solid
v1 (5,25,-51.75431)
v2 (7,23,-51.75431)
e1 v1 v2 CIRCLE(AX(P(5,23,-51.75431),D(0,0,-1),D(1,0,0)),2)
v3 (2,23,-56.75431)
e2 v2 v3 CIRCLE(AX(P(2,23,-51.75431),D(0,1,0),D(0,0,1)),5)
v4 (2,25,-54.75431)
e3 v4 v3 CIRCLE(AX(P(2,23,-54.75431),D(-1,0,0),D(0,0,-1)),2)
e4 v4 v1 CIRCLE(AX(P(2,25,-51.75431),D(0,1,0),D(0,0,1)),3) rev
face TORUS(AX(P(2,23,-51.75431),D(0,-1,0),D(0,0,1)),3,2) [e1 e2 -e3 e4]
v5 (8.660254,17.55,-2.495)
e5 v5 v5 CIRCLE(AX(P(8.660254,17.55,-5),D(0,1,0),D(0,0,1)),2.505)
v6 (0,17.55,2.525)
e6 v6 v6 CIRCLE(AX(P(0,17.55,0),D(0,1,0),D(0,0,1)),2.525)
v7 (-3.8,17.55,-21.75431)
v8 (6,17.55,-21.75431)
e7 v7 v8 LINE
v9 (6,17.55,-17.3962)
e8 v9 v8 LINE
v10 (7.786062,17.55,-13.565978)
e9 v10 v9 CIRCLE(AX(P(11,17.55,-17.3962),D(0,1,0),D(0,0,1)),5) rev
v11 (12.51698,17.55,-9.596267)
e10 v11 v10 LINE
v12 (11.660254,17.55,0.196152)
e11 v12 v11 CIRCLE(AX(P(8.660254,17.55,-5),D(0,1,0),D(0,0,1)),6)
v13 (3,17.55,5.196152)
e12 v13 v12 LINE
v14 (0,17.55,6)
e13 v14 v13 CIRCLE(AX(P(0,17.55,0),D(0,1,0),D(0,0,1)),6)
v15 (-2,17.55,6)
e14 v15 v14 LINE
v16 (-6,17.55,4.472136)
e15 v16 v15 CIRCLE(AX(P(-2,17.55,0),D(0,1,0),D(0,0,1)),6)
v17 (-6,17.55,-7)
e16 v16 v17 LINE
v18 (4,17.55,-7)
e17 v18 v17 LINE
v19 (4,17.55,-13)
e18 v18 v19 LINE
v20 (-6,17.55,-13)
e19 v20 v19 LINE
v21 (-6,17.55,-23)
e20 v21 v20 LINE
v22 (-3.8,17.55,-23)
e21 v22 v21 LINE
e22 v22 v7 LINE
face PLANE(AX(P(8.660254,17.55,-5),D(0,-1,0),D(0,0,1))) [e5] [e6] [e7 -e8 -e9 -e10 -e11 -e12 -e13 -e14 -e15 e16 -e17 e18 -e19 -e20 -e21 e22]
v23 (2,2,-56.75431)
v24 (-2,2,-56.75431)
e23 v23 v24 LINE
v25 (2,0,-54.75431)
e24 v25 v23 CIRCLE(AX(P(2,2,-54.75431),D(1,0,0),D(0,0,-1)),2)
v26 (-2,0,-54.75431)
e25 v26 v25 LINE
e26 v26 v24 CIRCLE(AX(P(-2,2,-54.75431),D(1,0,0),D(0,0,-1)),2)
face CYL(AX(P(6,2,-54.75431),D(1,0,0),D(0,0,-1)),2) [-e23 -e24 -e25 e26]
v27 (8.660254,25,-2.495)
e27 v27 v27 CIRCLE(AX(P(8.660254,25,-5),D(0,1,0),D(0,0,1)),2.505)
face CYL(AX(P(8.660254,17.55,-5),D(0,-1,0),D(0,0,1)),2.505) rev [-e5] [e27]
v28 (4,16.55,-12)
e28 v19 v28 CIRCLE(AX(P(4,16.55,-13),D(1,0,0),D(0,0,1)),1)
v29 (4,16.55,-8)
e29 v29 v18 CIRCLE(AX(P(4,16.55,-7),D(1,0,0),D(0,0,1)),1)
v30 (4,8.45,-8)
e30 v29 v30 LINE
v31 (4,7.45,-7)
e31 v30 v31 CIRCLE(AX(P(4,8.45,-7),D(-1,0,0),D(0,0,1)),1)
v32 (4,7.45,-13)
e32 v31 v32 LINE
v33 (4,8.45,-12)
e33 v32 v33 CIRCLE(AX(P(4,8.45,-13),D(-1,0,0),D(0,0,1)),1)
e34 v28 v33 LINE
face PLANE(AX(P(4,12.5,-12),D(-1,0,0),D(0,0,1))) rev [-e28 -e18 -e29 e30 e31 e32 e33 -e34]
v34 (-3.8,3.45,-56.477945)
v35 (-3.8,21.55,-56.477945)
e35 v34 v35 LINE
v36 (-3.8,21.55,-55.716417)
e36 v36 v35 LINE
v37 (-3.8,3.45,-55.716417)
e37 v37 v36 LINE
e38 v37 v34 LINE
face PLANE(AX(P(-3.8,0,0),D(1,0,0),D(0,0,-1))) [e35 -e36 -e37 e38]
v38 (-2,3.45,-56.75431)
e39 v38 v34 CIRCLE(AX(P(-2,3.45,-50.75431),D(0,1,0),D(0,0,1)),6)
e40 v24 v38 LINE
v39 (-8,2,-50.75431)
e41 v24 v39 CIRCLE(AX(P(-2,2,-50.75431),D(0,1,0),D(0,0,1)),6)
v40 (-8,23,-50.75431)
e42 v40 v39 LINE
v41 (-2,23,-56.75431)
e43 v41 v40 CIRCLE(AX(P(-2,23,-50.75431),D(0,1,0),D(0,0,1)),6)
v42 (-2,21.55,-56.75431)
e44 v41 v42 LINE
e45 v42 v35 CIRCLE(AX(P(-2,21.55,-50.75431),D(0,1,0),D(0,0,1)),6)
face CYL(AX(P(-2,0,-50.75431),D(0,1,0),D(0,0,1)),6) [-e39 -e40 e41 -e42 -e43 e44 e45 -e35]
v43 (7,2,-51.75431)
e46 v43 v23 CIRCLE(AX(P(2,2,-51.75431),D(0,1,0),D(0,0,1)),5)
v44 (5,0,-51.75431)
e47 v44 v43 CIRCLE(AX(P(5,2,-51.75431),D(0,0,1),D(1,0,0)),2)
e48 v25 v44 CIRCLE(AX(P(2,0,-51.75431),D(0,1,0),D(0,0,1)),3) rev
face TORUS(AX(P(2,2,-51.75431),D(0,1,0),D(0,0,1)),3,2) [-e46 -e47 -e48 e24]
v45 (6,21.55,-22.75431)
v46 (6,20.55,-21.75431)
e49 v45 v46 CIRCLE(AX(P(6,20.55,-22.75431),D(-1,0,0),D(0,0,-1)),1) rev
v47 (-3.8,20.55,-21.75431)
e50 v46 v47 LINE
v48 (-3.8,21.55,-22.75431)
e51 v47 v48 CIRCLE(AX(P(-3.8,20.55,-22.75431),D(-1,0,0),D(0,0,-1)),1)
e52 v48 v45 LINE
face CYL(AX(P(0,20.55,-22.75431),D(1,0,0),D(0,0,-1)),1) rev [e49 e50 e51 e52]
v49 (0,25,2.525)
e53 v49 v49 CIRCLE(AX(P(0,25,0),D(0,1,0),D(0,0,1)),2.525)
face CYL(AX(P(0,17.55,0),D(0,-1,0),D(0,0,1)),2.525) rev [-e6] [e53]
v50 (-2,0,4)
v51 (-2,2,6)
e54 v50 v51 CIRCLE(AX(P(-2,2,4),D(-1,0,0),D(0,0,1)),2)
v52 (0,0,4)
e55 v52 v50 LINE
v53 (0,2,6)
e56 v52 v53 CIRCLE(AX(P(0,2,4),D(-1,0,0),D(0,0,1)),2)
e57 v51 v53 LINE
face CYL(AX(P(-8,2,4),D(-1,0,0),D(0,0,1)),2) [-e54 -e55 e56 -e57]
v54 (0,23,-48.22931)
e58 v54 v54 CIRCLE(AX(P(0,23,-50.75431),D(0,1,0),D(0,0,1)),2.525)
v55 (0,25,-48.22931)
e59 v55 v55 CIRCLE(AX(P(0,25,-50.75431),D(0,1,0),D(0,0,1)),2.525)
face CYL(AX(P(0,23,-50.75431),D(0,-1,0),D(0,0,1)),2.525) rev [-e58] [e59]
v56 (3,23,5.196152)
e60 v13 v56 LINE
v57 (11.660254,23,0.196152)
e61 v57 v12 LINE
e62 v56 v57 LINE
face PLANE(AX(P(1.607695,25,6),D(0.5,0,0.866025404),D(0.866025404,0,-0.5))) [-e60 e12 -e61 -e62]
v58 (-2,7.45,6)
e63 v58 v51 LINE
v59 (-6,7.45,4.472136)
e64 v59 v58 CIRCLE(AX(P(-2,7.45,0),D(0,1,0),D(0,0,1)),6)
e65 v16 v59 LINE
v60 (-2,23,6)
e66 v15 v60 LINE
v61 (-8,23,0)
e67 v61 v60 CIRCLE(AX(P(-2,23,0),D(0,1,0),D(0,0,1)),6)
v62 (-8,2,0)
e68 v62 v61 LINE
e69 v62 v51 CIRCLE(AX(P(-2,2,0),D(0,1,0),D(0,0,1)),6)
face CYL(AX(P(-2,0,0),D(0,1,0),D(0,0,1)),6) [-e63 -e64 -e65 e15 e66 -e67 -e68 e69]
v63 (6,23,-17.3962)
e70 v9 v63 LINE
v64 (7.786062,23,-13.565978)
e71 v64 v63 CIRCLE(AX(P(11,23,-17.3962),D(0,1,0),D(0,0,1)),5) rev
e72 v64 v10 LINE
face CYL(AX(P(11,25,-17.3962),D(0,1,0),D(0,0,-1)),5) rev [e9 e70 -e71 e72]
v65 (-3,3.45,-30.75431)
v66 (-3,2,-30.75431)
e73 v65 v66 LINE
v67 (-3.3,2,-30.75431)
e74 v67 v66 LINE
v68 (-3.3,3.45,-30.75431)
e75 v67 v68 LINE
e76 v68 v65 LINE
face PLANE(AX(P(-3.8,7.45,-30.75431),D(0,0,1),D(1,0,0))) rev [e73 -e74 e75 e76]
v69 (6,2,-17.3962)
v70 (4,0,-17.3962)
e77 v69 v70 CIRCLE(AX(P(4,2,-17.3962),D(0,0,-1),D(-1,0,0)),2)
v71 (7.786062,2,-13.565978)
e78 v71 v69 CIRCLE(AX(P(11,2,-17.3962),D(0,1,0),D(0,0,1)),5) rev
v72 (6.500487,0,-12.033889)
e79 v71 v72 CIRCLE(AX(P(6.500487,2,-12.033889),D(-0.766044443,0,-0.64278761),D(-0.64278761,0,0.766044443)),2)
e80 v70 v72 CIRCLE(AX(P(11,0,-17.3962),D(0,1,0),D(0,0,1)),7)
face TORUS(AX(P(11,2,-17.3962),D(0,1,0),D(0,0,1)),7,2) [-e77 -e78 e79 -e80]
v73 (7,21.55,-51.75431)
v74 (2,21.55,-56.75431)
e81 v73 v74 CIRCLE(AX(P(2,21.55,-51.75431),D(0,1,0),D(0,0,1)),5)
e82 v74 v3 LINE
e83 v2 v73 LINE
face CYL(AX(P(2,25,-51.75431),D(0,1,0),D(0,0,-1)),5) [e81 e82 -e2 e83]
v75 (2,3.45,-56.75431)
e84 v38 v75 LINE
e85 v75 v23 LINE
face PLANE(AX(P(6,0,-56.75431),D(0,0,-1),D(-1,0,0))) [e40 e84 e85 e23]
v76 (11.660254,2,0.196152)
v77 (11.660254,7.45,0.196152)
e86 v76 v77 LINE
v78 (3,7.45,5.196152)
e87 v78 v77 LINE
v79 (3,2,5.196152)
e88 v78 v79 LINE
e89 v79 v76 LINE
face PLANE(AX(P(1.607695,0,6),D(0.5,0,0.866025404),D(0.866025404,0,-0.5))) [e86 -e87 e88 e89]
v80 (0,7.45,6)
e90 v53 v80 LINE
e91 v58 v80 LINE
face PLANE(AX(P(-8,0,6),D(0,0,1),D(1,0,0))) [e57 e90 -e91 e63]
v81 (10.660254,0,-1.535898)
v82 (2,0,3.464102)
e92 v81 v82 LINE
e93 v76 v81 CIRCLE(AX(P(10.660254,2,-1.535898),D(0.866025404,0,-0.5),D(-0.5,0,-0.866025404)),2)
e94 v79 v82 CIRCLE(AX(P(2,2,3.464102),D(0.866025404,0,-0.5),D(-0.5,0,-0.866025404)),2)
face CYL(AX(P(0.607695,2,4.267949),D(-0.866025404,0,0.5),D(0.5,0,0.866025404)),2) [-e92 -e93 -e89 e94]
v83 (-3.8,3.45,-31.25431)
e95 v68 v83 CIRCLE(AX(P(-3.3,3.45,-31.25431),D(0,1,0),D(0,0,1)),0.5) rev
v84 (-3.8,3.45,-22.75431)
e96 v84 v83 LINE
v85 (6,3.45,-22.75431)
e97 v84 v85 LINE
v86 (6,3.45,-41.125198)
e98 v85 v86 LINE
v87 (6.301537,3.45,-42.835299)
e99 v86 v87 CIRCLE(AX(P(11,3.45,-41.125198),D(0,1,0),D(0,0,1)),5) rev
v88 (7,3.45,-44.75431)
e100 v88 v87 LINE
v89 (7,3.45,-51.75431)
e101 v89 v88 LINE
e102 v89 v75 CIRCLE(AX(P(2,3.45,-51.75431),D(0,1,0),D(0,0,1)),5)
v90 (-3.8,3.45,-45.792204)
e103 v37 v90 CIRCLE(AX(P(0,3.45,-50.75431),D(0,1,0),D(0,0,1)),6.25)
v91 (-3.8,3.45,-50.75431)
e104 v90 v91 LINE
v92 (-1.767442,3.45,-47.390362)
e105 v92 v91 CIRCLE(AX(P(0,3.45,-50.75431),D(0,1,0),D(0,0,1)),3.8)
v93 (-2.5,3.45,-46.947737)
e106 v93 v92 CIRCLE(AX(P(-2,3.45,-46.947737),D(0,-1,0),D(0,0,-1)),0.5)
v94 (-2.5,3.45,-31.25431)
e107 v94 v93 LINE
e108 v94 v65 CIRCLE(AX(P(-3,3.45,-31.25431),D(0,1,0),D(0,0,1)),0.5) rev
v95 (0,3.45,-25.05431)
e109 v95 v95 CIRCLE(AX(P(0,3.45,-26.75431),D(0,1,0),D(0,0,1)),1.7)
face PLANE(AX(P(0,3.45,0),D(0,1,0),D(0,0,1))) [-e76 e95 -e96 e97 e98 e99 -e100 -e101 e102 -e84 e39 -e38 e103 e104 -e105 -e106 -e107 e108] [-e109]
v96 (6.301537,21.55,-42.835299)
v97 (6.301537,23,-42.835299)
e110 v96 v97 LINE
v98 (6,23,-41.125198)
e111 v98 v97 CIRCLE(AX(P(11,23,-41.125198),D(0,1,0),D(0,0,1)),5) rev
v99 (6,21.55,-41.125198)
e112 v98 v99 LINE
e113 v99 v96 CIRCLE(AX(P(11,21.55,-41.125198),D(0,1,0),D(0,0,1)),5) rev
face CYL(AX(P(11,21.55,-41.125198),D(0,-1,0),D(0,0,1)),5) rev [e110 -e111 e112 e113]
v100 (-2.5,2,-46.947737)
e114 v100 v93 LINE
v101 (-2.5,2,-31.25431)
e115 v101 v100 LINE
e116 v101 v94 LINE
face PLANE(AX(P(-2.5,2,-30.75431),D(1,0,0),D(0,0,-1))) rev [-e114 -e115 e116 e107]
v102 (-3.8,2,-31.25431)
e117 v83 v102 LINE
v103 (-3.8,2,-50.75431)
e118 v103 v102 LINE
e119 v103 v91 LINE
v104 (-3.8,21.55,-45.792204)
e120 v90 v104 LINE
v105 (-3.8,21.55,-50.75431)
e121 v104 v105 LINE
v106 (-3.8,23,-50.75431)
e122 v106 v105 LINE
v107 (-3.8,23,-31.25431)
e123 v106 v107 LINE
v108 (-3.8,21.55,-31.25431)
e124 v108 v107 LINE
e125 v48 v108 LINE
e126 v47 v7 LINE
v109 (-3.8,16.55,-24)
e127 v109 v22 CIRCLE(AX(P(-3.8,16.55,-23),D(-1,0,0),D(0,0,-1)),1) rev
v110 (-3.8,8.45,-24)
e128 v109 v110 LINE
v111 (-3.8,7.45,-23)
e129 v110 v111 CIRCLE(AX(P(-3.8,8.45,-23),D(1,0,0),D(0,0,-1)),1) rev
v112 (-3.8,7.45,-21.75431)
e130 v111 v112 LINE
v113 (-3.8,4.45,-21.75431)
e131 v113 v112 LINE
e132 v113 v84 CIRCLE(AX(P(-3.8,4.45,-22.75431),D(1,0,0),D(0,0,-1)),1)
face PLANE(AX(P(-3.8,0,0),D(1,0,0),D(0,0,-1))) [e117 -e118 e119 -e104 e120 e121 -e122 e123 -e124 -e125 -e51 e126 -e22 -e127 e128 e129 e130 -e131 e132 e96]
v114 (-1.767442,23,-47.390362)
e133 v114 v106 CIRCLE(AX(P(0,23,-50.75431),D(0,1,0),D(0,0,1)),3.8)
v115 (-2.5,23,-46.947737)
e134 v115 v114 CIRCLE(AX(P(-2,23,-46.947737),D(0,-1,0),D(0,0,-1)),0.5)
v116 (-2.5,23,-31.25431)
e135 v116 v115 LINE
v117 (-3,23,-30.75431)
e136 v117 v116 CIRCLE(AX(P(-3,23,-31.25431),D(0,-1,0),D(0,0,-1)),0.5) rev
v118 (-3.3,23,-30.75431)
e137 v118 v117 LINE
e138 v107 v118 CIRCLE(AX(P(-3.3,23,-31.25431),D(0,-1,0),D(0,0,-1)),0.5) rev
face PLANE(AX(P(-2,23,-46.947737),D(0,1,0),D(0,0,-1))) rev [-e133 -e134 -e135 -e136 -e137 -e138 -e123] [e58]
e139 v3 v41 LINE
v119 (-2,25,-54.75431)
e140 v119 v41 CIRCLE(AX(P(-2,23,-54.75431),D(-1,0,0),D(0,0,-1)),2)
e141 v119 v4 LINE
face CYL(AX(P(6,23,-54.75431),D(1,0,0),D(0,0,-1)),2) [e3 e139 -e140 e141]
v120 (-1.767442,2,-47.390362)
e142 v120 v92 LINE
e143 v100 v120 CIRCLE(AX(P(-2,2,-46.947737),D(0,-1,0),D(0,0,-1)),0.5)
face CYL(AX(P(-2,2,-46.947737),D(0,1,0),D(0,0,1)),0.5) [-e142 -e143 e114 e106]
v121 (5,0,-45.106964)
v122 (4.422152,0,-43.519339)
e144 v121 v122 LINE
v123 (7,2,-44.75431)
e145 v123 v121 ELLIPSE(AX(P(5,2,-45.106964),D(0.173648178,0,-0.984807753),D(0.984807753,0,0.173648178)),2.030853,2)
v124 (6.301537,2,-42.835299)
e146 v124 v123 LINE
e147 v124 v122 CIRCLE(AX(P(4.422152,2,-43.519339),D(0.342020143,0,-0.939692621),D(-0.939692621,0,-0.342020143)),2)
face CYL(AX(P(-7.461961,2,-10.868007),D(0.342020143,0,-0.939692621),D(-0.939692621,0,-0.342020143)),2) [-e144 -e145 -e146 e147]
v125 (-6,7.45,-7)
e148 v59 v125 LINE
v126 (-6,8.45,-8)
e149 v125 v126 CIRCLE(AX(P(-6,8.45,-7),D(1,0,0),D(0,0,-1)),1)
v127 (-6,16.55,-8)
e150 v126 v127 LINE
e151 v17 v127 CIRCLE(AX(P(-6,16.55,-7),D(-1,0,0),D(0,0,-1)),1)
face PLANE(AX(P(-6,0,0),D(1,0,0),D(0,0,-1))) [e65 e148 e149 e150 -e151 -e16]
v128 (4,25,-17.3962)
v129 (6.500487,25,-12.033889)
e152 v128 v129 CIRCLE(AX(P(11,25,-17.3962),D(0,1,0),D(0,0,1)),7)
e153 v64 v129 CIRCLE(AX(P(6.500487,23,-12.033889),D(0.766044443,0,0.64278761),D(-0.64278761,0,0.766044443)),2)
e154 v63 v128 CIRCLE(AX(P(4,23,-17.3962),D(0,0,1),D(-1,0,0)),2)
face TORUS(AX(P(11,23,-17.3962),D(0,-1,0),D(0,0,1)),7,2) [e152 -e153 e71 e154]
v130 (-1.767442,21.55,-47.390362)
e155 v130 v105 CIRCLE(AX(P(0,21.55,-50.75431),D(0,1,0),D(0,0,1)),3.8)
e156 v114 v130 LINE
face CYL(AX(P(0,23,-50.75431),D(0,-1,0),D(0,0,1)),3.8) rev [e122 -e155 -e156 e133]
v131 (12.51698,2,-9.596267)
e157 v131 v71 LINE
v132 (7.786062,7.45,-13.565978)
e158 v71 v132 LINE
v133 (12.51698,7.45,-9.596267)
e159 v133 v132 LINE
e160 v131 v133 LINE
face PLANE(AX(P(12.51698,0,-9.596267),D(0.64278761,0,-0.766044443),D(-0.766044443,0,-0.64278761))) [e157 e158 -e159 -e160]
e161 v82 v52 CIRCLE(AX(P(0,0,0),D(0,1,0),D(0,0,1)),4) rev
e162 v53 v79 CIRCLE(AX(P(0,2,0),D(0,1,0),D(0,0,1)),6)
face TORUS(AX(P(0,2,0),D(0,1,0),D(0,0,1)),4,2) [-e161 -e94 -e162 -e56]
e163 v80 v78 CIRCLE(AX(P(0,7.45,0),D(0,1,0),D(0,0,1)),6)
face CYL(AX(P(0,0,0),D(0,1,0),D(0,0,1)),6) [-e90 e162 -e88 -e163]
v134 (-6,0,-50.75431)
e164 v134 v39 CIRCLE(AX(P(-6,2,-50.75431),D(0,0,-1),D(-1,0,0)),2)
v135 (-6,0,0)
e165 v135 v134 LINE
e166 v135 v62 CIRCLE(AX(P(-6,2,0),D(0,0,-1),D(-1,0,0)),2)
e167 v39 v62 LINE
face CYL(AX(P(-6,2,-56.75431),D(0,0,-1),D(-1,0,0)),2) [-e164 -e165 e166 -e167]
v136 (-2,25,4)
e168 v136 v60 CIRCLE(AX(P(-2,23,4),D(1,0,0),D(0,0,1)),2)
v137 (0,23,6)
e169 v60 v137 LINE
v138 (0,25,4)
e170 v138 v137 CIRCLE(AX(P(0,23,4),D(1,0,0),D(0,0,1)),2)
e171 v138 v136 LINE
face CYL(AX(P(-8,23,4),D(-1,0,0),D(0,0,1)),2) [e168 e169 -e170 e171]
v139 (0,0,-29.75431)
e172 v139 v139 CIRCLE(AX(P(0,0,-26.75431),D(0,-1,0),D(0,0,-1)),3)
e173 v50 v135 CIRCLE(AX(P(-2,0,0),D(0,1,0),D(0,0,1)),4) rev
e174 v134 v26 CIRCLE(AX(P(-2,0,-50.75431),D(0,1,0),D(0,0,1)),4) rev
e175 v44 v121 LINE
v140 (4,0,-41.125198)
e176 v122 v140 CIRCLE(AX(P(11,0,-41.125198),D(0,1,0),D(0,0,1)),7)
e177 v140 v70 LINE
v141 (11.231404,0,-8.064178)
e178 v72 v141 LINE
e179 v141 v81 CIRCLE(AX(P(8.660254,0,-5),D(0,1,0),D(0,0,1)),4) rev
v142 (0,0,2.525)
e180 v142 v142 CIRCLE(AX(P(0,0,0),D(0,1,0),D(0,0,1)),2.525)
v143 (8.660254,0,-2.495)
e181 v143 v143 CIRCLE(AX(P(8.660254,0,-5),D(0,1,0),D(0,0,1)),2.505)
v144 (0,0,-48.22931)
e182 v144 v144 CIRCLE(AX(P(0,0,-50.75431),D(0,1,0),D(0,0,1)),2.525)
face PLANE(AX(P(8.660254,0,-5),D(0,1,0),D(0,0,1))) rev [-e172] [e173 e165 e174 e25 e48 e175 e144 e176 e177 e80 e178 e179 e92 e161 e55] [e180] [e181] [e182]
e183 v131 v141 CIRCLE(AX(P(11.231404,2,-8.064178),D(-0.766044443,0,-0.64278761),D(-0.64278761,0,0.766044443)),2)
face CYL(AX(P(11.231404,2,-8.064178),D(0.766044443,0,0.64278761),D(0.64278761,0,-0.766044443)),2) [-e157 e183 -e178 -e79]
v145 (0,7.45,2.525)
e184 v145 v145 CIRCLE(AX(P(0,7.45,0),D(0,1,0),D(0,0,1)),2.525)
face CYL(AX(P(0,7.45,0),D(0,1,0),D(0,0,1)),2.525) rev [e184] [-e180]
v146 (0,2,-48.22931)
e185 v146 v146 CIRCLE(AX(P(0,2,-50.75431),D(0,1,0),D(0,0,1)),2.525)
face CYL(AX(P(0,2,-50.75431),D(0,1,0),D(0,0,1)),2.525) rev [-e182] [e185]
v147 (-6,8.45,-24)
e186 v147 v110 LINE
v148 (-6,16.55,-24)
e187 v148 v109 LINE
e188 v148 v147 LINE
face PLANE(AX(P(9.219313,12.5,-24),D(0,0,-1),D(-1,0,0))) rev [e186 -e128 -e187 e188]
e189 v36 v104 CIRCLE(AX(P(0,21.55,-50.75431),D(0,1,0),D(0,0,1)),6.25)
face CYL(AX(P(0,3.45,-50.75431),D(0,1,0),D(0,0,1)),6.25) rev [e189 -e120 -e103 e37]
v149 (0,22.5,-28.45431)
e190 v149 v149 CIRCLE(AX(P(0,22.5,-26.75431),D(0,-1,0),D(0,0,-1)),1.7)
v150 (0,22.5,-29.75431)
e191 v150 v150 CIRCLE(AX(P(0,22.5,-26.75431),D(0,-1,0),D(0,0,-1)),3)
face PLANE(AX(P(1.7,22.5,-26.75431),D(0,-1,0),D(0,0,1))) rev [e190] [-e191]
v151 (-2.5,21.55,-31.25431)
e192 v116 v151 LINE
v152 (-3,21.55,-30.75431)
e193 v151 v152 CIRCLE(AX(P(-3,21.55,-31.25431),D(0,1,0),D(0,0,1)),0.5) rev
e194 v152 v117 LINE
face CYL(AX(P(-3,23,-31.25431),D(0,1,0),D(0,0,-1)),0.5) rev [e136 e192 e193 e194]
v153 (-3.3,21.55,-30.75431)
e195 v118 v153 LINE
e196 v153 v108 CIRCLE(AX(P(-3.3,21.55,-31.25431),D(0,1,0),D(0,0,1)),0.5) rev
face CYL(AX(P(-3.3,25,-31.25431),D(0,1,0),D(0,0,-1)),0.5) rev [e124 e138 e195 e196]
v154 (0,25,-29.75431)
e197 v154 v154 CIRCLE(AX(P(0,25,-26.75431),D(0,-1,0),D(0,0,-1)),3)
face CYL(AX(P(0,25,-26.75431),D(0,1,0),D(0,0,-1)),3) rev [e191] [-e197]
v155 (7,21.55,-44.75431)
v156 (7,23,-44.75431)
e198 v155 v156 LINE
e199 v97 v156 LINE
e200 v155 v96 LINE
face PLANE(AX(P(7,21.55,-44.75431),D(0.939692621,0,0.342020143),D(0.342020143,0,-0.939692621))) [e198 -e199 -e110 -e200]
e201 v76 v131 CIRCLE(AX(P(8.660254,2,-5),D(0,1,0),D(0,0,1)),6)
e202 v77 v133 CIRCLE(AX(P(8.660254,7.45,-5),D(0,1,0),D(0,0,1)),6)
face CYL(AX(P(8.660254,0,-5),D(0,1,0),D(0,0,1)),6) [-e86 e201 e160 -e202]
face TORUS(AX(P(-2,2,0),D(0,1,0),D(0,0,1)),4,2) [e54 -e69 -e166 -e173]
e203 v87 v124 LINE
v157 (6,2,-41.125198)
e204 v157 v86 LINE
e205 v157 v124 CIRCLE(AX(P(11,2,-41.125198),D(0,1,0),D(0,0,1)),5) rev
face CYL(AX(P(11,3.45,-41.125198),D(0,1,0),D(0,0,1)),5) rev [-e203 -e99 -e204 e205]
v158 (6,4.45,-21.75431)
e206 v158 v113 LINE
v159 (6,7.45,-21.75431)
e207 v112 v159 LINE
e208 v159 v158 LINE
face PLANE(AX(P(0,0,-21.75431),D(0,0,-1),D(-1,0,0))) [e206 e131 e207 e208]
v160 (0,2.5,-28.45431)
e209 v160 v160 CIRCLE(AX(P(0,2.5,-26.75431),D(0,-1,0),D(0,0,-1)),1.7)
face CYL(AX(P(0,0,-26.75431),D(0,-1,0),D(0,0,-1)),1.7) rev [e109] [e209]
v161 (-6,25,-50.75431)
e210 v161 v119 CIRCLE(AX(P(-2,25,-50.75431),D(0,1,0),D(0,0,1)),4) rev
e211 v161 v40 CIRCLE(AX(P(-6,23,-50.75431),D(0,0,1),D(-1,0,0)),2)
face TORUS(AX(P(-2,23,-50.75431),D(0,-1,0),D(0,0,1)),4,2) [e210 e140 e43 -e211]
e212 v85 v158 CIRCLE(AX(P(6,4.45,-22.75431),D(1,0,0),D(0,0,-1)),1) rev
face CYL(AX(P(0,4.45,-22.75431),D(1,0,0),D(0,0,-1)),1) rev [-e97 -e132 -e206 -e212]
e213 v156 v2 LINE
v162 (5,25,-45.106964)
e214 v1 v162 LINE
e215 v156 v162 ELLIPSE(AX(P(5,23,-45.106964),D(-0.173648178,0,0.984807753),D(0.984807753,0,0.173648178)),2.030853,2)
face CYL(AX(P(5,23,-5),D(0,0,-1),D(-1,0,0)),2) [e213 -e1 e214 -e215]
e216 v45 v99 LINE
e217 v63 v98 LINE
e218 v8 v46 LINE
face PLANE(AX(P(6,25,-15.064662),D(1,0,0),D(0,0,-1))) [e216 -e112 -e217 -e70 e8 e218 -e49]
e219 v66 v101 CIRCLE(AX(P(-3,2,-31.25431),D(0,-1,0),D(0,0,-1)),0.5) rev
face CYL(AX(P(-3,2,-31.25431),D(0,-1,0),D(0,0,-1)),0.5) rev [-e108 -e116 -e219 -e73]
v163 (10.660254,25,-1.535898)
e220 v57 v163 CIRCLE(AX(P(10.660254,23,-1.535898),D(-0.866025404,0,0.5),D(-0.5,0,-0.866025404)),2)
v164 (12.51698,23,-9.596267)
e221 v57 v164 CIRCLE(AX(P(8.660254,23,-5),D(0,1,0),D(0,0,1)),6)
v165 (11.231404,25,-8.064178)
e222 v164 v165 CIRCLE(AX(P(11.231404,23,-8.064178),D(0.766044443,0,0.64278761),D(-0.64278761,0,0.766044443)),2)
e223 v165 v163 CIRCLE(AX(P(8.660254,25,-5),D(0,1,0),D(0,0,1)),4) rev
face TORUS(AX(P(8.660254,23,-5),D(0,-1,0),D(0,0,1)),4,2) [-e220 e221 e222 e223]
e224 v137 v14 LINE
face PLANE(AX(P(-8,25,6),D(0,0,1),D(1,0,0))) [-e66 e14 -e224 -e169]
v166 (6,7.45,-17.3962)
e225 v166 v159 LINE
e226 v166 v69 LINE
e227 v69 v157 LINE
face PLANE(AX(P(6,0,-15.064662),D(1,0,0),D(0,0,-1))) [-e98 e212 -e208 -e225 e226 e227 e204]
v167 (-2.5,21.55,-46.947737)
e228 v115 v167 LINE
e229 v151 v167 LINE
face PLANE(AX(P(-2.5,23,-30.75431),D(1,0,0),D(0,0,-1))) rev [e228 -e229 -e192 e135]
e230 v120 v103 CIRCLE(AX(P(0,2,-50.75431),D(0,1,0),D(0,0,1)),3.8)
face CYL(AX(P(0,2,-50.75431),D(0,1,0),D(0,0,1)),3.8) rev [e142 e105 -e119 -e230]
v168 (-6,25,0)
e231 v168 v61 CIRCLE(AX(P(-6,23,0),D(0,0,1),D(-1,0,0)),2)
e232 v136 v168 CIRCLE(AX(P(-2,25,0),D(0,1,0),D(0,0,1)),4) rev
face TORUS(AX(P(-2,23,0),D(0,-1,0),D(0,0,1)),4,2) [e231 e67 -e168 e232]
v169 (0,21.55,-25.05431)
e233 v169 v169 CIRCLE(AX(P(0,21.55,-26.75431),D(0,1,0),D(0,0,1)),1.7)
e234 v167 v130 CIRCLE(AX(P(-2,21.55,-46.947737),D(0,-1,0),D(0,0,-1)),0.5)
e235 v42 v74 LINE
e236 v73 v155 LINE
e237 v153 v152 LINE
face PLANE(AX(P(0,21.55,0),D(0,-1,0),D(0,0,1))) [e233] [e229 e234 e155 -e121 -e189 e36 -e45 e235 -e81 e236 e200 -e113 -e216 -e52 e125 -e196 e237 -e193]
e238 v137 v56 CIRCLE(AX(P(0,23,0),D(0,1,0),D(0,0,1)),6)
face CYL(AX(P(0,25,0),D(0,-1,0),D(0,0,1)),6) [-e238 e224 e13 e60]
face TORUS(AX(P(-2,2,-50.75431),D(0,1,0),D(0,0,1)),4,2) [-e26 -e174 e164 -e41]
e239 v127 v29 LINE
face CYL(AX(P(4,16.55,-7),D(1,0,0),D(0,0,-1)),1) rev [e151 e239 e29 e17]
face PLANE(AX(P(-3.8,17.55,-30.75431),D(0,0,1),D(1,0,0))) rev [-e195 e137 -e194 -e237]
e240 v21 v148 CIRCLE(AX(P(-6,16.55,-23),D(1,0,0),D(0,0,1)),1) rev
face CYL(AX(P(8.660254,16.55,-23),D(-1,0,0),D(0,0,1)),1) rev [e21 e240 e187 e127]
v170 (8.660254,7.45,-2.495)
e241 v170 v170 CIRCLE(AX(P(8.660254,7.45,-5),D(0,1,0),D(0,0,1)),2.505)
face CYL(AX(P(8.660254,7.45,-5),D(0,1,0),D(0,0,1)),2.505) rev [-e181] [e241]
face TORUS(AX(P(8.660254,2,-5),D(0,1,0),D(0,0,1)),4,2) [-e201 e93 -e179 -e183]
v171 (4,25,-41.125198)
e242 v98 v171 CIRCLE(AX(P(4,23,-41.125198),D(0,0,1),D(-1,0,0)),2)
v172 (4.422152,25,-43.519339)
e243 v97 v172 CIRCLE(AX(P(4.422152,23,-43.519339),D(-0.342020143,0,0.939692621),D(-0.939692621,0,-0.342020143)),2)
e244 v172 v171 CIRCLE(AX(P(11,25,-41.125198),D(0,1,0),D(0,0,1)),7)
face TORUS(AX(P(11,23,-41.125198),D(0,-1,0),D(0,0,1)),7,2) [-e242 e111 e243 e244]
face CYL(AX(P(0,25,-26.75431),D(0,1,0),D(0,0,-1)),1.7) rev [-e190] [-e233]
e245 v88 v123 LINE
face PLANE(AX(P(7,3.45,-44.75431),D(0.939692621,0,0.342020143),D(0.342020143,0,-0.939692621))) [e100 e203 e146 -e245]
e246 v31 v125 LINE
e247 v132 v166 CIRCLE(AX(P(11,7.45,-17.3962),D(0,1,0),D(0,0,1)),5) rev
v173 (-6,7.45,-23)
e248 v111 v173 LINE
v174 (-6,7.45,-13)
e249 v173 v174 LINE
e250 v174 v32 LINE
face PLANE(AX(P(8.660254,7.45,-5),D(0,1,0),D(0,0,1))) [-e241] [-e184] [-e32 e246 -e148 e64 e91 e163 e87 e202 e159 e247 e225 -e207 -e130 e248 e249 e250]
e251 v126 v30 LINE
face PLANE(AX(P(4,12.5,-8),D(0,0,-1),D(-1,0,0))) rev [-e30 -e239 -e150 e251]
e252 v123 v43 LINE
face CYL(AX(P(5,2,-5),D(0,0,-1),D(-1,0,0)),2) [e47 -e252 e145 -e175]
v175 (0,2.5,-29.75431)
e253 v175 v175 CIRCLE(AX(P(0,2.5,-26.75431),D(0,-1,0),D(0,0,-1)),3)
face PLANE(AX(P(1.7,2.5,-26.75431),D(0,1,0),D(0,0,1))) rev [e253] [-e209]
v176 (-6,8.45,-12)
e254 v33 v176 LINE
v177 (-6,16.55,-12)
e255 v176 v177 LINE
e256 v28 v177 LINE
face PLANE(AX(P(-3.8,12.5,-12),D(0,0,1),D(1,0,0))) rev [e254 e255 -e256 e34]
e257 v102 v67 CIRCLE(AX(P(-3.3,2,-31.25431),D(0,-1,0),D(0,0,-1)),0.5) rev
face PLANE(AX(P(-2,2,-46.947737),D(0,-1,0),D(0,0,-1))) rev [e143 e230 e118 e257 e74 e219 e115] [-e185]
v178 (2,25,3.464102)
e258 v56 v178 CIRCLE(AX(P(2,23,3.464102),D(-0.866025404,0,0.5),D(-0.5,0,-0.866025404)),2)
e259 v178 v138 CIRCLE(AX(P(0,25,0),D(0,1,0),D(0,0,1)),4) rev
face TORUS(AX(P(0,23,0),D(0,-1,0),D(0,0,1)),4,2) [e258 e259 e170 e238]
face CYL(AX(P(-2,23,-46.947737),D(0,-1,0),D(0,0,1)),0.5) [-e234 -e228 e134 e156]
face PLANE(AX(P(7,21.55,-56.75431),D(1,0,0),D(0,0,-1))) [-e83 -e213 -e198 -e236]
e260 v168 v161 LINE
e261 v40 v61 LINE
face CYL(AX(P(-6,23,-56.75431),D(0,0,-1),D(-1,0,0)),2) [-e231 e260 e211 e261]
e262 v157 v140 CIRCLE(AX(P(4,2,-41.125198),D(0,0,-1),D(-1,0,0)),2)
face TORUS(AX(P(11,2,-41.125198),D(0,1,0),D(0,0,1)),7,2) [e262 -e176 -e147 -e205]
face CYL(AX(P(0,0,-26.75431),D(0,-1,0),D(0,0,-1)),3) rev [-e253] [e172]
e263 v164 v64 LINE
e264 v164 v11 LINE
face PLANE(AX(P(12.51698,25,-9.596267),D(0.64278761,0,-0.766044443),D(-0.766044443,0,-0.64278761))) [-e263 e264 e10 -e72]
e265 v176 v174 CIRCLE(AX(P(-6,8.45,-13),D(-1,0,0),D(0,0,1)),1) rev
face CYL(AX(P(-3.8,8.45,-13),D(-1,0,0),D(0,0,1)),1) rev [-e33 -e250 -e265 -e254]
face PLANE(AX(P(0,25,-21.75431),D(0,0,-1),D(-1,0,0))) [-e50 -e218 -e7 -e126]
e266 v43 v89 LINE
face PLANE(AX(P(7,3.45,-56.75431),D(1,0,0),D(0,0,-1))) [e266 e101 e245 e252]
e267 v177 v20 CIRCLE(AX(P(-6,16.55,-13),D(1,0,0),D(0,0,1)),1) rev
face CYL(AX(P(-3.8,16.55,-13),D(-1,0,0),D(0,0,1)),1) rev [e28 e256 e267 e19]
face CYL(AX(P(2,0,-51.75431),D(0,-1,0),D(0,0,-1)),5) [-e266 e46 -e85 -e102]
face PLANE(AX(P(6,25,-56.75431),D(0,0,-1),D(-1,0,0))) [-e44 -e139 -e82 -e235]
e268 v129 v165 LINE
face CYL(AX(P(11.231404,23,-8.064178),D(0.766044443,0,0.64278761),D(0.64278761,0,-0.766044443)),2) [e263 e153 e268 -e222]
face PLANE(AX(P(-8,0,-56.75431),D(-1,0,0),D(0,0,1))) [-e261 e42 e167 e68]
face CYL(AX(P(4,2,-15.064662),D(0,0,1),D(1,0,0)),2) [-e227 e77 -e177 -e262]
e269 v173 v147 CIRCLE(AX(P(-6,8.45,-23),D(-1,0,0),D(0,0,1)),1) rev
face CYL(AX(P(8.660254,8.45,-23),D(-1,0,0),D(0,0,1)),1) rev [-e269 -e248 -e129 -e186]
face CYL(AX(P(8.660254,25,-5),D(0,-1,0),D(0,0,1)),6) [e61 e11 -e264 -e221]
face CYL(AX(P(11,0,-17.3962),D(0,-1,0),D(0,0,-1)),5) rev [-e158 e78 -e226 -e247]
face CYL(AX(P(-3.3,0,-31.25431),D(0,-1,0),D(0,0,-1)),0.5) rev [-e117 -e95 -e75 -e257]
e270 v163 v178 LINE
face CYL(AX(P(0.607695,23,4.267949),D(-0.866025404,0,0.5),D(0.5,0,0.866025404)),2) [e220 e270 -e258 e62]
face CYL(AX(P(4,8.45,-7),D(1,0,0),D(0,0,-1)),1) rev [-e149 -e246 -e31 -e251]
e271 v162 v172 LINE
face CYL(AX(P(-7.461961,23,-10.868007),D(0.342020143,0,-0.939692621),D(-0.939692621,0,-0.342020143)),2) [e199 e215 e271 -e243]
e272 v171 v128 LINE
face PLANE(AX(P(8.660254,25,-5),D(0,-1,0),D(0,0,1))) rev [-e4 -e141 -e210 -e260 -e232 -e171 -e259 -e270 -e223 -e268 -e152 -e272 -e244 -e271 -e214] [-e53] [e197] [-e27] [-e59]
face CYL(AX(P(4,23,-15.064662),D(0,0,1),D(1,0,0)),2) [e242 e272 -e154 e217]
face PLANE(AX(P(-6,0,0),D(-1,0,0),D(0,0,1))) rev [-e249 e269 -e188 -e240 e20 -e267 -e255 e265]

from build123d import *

# Parameters (mm, degrees)
EXTRUDE_1_DEPTH           = 7.45
EXTRUDE_2_DEPTH           = 3.45
SKETCH_3_W                = 26
SKETCH_3_H                = 4
CUT_EXTRUDE_1_DEPTH       = 9.8
SKETCH_4_W                = 4.2
SKETCH_4_H                = 62.754310162
EXTRUDE_3_DEPTH           = 5.05
CUT_EXTRUDE_2_DEPTH       = 1.45
SKETCH_6_W                = 7.8
SKETCH_6_H                = 4
EXTRUDE_4_DEPTH           = 5.05
SKETCH_7_W                = 9.8
SKETCH_7_H                = 4
CUT_EXTRUDE_3_DEPTH       = 9
CUT_EXTRUDE_4_DEPTH       = 9.05
CUT_EXTRUDE_5_REACH       = 63.678
SKETCH_10_W               = 5.05
SKETCH_10_H               = 12
SKETCH_11_W               = 14
SKETCH_11_H               = 5.05
CUT_EXTRUDE_6_DEPTH       = 2.2
HOLE_WIZARD_1_D           = 5.01
HOLE_WIZARD_2_D           = 5.05
HOLE_WIZARD_3_D           = 5.05
HOLE_WIZARD_4_D           = 3.4
HOLE_WIZARD_4_DEPTH       = 12.5
HOLE_WIZARD_4_CBORE_D     = 6
HOLE_WIZARD_4_CBORE_DEPTH = 2.5
FILLET_1_R                = 5
FILLET_2_R                = 6
FILLET_3_R                = 0.5
FILLET_4_R                = 1
FILLET_5_R                = 2


# Read off the part's stored shape, not the designer's step: 镜向2
with BuildPart() as part:
    # 草图1 → 凸台-拉伸1 (new body)
    with BuildSketch(Plane(origin=(0, 7.45, 0), x_dir=(1, 0, 0), z_dir=(0, 1, 0))):
        with BuildLine():
            Line((6, 15.064661918), (6, 56.754310162))
            Line((6, 56.754310162), (-8, 56.754310162))
            Line((-8, 56.754310162), (-8, -6))
            Line((-8, -6), (1.607695155, -6))
            Line((1.607695155, -6), (11.660254038, -0.196152423))
            ThreePointArc((11.660254038, -0.196152423), (14.637422226, 4.477065544), (12.516979696, 9.596266659))
            Line((12.516979696, 9.596266659), (6, 15.064661918))
        make_face()
    extrude(amount=-EXTRUDE_1_DEPTH)

    # 草图2 → 凸台-拉伸2 (add)
    with BuildSketch(Plane.XZ):
        Polygon((6, -42.006832742), (6, -56.754310162), (7, -56.754310162), (7, -44.754310162), align=None)
    extrude(amount=-EXTRUDE_2_DEPTH)

    # 草图3 → 切除-拉伸1 (cut)
    with BuildSketch(Plane(origin=(6, 0, 0), x_dir=(0, 0, -1), z_dir=(1, 0, 0))):
        with Locations((43.754310162, 5.45)):
            Rectangle(SKETCH_3_W, SKETCH_3_H)
    extrude(amount=-CUT_EXTRUDE_1_DEPTH, mode=Mode.SUBTRACT)

    # 草图4 → 凸台-拉伸3 (add)
    with BuildSketch(Plane(origin=(0, 7.45, 0), x_dir=(-1, 0, 0), z_dir=(0, 1, 0))):
        with Locations((5.9, -25.377155081)):
            Rectangle(SKETCH_4_W, SKETCH_4_H)
    extrude(amount=EXTRUDE_3_DEPTH)

    # 草图5 → 切除-拉伸2 (cut)
    with BuildSketch(Plane(origin=(0, 3.45, 0), x_dir=(-1, 0, 0), z_dir=(0, 1, 0))):
        with BuildLine():
            Line((3.8, -30.754310162), (2.5, -30.754310162))
            Line((2.5, -30.754310162), (2.5, -46.9477369))
            ThreePointArc((2.5, -46.9477369), (2.258573906, -47.375684951), (1.76744186, -47.390361698))
            ThreePointArc((1.76744186, -47.390361698), (-3.252405192, -52.719471851), (3.8, -50.754310162))
            Line((3.8, -50.754310162), (3.8, -30.754310162))
        make_face()
    extrude(amount=-CUT_EXTRUDE_2_DEPTH, mode=Mode.SUBTRACT)

    # 草图6 → 凸台-拉伸4 (add)
    with BuildSketch(Plane(origin=(0, 7.45, 0), x_dir=(-1, 0, 0), z_dir=(0, 1, 0))):
        with Locations((-0.1, -10)):
            Rectangle(SKETCH_6_W, SKETCH_6_H)
    extrude(amount=EXTRUDE_4_DEPTH)

    # 草图7 → 切除-拉伸3 (cut)
    with BuildSketch(Plane(origin=(0, 0, -30.754310162), x_dir=(-1, 0, 0), z_dir=(0, 0, -1))):
        with Locations((-1.1, 5.45)):
            Rectangle(SKETCH_7_W, SKETCH_7_H)
    extrude(amount=-CUT_EXTRUDE_3_DEPTH, mode=Mode.SUBTRACT)

    # 草图8 → 切除-拉伸4 (cut)
    with BuildSketch(Plane(origin=(0, 12.5, 0), x_dir=(-1, 0, 0), z_dir=(0, 1, 0))):
        with BuildLine():
            Line((3.8, -45.792203754), (3.8, -55.716416569))
            ThreePointArc((3.8, -55.716416569), (6.25, -50.754310162), (3.8, -45.792203754))
        make_face()
    extrude(amount=-CUT_EXTRUDE_4_DEPTH, mode=Mode.SUBTRACT)

    # 草图10 → 切除-拉伸5 (cut, up to next)
    with BuildSketch(Plane(origin=(-6, 0, 0), x_dir=(0, -1, 0), z_dir=(-1, 0, 0)), mode=Mode.PRIVATE) as cut_extrude_5_sk1:
        with Locations((-9.975, -18)):
            Rectangle(SKETCH_10_W, SKETCH_10_H)
    cut_extrude_5_tool1 = extrude(cut_extrude_5_sk1.sketch, amount=-CUT_EXTRUDE_5_REACH, mode=Mode.PRIVATE) & part.part
    add(cut_extrude_5_tool1.solids().sort_by_distance((-6, 9.975, -18))[0], mode=Mode.SUBTRACT)

    # 草图11 → 切除-拉伸6 (cut)
    with BuildSketch(Plane(origin=(-3.8, 0, 0), x_dir=(0, 0, -1), z_dir=(1, 0, 0))):
        with Locations((1, 9.975)):
            Rectangle(SKETCH_11_W, SKETCH_11_H)
    extrude(amount=-CUT_EXTRUDE_6_DEPTH, mode=Mode.SUBTRACT)

    # 孔1 (through all)
    with Locations(Plane(origin=(0, 7.45, 0), x_dir=(1, 0, 0), z_dir=(0, 1, 0))):
        with Locations((8.660254038, 5)):
            Hole(HOLE_WIZARD_1_D / 2)

    # 孔2 (through all)
    with Locations(Plane(origin=(0, 7.45, 0), x_dir=(1, 0, 0), z_dir=(0, 1, 0))):
        with Locations((0, 0)):
            Hole(HOLE_WIZARD_2_D / 2)

    # 孔3 (through all)
    with Locations(Plane(origin=(0, 2, 0), x_dir=(1, 0, 0), z_dir=(0, 1, 0))):
        with Locations((0, 50.754310162)):
            Hole(HOLE_WIZARD_3_D / 2)

    # 孔4
    with Locations(Plane(origin=(0, 0, 0), x_dir=(-1, 0, 0), z_dir=(0, -1, 0))):
        with Locations((0, 26.754310162)):
            CounterBoreHole(HOLE_WIZARD_4_D / 2, HOLE_WIZARD_4_CBORE_D / 2, HOLE_WIZARD_4_CBORE_DEPTH, depth=HOLE_WIZARD_4_DEPTH)

    # 圆角1
    fillet_1_edges = [part.edges().sort_by_distance(p)[0] for p in [
        (6, 3.725, -15.064661918),
        (6, 1.725, -42.006832742),
        (7, 1.725, -56.754310162),
    ]]
    fillet(fillet_1_edges, radius=FILLET_1_R)

    # 圆角2
    fillet_2_edges = [part.edges().sort_by_distance(p)[0] for p in [
        (-8, 6.25, -56.754310162),
        (-8, 6.25, 6),
        (1.607695155, 3.725, 6),
    ]]
    fillet(fillet_2_edges, radius=FILLET_2_R)

    # 圆角3
    fillet_3_edges = [part.edges().sort_by_distance(p)[0] for p in [
        (-2.5, 2.725, -30.754310162),
        (-3.8, 2.725, -30.754310162),
    ]]
    fillet(fillet_3_edges, radius=FILLET_3_R)

    # 圆角4
    fillet_4_edges = [part.edges().sort_by_distance(p)[0] for p in [
        (-4.9, 7.45, -24),
        (-1, 7.45, -8),
        (-1, 7.45, -12),
        (1.1, 3.45, -21.754310162),
    ]]
    fillet(fillet_4_edges, radius=FILLET_4_R)

    # 圆角5
    fillet_5_edges = [part.edges().sort_by_distance(p)[0] for p in [
        (6, 0, -29.260699024),
        (0, 0, -56.754310162),
        (7, 0, -48.254310162),
        (5.535533906, 0, -55.289844068),
        (6.075961235, 0, -41.993438727),
        (6.468461065, 0, -15.2831089),
        (-8, 0, -25.377155081),
        (7.330127019, 0, 2.696152423),
        (-1, 0, 6),
        (1.552914271, 0, 5.795554958),
        (-6.242640687, 0, 4.242640687),
        (-6.242640687, 0, -54.996950849),
        (6.650768448, 0, -43.794804359),
        (14.637422226, 0, -4.477065544),
        (10.151520824, 0, -11.581122326),
    ]]
    fillet(fillet_5_edges, radius=FILLET_5_R)

    # 镜向2: part across plane


with BuildPart() as part_1:
    add(part.part)
    add(part.part.mirror(Plane.ZX.offset(12.5)))


solid = part_1.part
